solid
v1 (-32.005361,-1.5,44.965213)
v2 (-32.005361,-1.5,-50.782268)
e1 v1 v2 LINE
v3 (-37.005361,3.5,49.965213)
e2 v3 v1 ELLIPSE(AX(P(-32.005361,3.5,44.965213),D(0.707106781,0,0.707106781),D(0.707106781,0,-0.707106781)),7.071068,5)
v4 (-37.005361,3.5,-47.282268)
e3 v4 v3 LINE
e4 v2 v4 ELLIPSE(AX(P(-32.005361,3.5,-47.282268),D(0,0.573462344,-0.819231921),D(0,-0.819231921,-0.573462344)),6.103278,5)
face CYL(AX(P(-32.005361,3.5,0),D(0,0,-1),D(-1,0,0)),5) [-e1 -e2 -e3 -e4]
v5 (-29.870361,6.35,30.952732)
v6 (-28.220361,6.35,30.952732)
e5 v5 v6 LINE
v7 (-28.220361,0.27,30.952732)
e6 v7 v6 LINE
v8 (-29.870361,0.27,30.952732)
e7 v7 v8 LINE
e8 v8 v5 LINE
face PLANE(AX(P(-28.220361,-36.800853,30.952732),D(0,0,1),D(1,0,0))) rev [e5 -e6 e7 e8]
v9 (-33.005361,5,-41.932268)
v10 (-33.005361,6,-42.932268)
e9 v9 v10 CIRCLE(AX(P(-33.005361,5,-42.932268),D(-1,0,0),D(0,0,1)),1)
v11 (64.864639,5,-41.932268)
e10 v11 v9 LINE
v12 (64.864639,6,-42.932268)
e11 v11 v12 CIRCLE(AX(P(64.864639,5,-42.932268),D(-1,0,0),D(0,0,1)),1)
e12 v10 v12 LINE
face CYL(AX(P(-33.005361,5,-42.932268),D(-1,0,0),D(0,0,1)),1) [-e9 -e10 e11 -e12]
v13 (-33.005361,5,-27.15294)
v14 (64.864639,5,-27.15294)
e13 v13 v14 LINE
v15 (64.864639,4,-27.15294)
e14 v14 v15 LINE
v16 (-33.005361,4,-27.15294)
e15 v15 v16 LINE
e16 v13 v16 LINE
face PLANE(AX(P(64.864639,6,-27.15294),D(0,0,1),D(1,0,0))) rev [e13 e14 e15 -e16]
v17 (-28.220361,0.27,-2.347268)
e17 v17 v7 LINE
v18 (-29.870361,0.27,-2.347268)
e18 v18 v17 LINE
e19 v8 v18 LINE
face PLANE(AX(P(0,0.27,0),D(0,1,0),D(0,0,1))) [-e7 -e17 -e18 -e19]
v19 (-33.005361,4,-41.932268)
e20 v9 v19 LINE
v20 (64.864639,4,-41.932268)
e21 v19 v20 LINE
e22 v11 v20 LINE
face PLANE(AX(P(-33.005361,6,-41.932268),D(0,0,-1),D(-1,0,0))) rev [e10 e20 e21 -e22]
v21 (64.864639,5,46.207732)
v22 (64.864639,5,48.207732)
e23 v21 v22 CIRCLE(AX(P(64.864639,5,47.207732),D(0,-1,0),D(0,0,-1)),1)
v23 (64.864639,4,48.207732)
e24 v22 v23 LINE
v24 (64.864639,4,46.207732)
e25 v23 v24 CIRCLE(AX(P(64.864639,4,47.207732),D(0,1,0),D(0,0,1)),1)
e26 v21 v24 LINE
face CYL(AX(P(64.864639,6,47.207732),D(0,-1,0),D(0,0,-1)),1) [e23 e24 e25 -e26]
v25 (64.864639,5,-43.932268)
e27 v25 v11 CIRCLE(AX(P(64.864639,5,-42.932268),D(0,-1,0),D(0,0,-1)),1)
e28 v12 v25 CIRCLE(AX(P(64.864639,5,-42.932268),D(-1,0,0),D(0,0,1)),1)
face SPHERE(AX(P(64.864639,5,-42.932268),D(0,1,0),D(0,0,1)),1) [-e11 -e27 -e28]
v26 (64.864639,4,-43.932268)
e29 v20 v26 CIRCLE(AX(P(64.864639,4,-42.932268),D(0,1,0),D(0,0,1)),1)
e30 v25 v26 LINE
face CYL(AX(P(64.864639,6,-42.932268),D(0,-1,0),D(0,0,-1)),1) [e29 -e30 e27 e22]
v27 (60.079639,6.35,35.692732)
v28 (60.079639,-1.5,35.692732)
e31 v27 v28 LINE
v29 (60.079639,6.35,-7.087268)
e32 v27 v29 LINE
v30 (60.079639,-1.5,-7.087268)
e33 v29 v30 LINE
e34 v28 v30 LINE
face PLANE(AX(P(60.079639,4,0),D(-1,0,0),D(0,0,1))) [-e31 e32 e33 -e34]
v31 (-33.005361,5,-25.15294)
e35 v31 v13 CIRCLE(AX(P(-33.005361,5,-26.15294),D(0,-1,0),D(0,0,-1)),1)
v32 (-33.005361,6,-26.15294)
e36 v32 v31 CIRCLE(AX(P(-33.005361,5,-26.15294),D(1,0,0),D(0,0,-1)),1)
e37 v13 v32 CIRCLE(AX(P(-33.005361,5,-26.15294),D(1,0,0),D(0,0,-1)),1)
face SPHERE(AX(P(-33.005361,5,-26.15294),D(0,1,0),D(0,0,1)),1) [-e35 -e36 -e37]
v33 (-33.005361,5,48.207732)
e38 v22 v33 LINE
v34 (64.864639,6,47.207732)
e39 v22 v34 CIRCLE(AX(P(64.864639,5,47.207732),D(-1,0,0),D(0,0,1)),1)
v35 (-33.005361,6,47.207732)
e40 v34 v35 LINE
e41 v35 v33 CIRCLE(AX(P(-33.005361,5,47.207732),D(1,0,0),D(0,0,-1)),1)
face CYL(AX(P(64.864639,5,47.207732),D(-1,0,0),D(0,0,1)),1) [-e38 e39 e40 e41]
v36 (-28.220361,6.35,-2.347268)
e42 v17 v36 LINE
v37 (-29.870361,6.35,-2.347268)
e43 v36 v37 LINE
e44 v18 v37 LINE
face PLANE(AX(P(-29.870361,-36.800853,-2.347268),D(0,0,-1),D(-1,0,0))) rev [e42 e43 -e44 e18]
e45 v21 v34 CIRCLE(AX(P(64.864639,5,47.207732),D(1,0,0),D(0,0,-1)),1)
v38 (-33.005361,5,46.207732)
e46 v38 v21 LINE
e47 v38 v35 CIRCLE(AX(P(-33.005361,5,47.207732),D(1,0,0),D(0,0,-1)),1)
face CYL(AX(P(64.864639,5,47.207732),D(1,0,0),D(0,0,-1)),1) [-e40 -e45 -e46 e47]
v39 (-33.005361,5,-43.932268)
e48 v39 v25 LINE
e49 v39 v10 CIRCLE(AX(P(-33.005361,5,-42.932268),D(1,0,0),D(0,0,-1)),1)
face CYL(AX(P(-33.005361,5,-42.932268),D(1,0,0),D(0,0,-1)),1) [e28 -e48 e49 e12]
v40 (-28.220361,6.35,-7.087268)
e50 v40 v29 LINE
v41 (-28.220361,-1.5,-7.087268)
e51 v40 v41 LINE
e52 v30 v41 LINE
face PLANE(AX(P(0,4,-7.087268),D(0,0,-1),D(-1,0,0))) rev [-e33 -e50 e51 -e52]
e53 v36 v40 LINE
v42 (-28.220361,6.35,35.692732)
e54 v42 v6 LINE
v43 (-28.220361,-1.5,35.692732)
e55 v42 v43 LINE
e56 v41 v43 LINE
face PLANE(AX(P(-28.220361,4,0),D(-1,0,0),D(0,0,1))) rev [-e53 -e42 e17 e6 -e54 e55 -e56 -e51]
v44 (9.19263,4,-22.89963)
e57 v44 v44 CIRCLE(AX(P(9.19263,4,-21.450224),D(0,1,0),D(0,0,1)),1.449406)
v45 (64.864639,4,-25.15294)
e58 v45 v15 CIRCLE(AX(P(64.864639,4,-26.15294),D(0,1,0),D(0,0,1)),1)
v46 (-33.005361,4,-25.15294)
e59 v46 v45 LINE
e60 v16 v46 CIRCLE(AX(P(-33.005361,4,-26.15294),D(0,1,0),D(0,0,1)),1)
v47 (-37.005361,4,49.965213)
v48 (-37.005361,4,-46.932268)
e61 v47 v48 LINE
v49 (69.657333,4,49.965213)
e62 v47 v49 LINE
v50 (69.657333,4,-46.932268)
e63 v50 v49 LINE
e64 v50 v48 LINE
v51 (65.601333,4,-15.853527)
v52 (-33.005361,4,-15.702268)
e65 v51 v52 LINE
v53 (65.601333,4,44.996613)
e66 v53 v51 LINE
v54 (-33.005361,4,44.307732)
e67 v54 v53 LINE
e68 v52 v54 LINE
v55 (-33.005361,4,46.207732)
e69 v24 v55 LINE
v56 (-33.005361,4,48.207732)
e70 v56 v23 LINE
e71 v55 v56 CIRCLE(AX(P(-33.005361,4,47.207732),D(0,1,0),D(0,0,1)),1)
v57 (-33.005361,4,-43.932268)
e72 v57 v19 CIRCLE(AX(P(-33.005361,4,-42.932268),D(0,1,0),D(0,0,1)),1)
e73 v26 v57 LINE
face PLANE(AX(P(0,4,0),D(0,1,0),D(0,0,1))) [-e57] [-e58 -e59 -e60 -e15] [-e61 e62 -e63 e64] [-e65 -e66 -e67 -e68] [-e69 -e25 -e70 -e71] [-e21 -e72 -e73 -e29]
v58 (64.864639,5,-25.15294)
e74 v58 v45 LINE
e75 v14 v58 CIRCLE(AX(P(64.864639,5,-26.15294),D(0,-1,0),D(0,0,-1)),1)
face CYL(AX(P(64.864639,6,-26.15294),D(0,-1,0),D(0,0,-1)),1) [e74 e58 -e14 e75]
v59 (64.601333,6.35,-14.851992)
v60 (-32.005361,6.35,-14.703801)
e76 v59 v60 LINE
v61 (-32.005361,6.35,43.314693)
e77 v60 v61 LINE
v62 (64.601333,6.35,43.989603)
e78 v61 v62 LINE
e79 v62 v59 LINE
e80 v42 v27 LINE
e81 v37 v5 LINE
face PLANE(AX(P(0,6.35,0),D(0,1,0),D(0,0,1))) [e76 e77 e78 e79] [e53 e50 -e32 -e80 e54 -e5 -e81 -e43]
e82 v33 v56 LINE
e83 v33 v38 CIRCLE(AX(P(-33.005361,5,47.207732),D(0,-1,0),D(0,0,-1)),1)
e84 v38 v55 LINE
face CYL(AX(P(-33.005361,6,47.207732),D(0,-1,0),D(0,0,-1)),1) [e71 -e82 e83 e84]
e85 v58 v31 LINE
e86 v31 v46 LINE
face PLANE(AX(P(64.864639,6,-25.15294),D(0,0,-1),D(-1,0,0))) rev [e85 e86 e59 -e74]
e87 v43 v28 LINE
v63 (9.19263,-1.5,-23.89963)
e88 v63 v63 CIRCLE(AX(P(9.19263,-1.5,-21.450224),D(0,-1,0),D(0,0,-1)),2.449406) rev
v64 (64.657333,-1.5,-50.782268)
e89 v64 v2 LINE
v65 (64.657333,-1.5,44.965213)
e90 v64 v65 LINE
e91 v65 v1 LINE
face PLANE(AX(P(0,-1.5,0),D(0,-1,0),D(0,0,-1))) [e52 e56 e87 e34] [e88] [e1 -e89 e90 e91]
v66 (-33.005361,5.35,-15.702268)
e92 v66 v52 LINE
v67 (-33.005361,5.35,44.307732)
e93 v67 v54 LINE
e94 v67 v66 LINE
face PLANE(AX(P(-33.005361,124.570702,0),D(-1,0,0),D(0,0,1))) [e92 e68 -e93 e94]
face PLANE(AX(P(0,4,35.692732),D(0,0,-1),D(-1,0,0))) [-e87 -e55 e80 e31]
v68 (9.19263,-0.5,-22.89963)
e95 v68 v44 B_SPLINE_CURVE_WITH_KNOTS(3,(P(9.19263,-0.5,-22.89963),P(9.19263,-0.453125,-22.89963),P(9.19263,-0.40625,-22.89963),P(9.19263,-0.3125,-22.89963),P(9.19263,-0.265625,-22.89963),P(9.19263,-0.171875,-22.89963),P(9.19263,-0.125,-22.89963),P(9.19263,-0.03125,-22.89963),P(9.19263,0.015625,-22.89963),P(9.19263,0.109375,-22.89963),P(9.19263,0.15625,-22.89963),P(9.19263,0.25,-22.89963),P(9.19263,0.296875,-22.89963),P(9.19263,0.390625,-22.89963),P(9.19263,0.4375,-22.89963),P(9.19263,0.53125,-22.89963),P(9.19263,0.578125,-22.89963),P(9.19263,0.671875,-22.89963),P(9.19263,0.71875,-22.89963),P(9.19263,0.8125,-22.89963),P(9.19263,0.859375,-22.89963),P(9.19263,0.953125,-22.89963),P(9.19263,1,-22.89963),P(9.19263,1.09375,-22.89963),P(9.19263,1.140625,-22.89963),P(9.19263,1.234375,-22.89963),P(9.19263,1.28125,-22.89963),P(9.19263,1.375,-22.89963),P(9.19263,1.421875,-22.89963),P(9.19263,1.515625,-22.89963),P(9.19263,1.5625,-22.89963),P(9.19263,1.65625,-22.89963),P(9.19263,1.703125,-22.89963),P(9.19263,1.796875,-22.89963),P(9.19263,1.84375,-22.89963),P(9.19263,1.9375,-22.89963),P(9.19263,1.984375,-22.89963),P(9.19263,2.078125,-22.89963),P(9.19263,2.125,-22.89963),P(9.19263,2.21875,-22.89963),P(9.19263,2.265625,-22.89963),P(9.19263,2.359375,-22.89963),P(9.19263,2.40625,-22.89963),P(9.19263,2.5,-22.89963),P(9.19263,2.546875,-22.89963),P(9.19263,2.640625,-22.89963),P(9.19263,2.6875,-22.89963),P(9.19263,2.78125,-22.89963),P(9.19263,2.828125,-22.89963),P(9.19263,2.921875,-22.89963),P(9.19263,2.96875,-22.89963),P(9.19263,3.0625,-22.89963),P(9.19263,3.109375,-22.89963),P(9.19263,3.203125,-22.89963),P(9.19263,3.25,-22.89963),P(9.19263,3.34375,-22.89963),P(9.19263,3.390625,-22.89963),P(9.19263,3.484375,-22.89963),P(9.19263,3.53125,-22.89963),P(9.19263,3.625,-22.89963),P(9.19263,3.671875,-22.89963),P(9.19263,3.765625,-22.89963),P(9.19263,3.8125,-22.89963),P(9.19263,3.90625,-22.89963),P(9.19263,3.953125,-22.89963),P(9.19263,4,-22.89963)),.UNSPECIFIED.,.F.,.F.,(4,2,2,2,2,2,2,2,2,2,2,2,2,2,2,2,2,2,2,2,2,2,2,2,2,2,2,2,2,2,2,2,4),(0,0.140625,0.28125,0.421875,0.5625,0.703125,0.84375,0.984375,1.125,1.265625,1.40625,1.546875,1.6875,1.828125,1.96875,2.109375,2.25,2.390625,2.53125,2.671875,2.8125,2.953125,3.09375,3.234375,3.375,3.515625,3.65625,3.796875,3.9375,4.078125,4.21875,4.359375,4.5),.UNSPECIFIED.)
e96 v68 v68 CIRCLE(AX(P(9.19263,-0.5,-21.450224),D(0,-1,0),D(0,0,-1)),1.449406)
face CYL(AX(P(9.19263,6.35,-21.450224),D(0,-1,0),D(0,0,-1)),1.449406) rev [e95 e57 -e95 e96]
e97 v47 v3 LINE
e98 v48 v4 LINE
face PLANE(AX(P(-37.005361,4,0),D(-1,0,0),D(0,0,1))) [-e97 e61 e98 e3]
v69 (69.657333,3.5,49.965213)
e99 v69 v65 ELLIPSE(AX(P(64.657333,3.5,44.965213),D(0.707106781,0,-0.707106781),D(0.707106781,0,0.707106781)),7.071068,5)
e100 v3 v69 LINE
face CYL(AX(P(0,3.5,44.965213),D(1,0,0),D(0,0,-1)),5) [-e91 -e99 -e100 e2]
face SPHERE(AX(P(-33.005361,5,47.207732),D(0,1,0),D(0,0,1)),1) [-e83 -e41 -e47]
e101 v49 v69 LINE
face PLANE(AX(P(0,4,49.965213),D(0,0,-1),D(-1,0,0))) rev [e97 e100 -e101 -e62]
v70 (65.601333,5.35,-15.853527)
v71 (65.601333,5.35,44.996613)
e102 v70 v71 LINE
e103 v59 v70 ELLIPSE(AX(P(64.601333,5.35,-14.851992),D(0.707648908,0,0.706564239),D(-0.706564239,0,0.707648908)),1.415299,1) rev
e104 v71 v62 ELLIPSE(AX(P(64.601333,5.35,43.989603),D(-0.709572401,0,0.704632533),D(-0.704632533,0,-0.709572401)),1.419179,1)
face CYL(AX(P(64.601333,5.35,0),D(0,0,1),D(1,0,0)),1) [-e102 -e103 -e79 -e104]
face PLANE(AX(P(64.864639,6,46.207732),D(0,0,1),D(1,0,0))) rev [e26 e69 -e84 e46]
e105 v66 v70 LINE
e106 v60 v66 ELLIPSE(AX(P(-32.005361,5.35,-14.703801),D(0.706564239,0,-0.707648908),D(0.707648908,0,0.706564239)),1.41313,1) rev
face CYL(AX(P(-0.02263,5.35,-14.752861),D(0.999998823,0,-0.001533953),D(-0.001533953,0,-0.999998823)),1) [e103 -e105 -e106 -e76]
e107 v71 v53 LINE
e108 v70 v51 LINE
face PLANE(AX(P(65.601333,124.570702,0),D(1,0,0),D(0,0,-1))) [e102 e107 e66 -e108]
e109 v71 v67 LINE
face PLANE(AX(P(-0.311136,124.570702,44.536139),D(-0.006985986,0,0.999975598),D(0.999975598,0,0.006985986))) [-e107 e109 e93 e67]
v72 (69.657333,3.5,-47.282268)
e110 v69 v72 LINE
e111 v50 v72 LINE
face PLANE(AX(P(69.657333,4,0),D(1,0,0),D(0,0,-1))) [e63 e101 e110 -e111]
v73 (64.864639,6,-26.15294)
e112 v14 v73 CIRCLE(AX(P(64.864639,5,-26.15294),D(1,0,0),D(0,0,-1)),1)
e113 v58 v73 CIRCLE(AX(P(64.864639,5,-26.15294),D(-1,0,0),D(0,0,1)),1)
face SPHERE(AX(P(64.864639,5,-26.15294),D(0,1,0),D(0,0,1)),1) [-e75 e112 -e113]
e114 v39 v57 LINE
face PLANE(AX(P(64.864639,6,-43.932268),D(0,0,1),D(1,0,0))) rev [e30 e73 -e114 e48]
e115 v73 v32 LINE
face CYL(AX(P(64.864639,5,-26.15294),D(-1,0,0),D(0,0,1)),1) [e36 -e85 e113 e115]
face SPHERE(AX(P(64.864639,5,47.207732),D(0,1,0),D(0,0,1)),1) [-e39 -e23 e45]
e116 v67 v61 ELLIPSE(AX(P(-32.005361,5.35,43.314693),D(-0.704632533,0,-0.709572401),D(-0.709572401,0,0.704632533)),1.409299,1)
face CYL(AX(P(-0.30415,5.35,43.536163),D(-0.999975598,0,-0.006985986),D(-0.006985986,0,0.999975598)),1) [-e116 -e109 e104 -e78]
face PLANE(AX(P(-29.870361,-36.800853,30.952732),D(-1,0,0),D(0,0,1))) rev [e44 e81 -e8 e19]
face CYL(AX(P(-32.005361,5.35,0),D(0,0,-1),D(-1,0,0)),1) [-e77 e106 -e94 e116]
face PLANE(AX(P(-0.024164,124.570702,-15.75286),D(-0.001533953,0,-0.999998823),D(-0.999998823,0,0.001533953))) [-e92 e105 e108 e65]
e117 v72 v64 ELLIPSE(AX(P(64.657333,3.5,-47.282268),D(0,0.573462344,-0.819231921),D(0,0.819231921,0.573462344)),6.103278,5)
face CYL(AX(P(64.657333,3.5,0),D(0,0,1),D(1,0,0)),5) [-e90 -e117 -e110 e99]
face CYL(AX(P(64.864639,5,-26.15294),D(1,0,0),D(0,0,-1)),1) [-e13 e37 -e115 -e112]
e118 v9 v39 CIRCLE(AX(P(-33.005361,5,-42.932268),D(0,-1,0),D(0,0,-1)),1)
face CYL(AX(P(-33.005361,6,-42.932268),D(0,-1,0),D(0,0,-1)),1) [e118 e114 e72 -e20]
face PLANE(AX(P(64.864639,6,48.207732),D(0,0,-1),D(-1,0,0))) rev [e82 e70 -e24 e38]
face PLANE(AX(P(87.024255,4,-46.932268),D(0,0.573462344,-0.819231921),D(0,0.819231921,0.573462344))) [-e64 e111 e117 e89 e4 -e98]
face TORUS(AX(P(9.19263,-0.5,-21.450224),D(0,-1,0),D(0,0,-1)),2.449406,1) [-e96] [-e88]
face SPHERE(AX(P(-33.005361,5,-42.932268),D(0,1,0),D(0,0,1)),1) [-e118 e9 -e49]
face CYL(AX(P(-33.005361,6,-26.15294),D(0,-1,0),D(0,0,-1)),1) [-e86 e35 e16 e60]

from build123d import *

# Parameters (mm, degrees)
SKETCH1_W           = 106.662693993
SKETCH1_H           = 83.18856
SKETCH1_W_2         = 88.3
SKETCH1_H_2         = 42.78
BOSS_EXTRUDE1_DEPTH = 4
SKETCH1_4_W         = 88.3
SKETCH1_4_H         = 42.78
BOSS_EXTRUDE2_DEPTH = 6.35
SKETCH2_R           = 1.449406475
CUT_EXTRUDE1_DEPTH  = 86.959228837
BOSS_EXTRUDE3_DEPTH = 106.662693993
FILLET6_R           = 1
BOSS_EXTRUDE4_DEPTH = 2
FILLET7_R           = 1
SKETCH5_W           = 1.65
SKETCH5_H           = 33.3
CUT_EXTRUDE3_DEPTH  = 6.08
BOSS_EXTRUDE6_START = 1.5
SKETCH10_W          = 106.662693993
SKETCH10_H          = 93.062075056
SKETCH10_R          = 1.449406475
SKETCH10_W_2        = 88.3
SKETCH10_H_2        = 42.78
BOSS_EXTRUDE6_DEPTH = 1.5
BOSS_EXTRUDE7_DEPTH = 106.662693993
FILLET9_R           = 1
FILLET10_R          = 5


with BuildPart() as part:
    # Sketch1 → Boss-Extrude1 (new body)
    with BuildSketch(Plane(origin=(0, 0, 0), x_dir=(1, 0, 0), z_dir=(0, 1, 0))):
        with Locations((16.325985563, -8.370933327)):
            Rectangle(SKETCH1_W, SKETCH1_H)
        with Locations((15.929638567, -14.302731543)):
            Rectangle(SKETCH1_W_2, SKETCH1_H_2, mode=Mode.SUBTRACT)
    extrude(amount=BOSS_EXTRUDE1_DEPTH)

    # Sketch1<4> → Boss-Extrude2 (add)
    with BuildSketch(Plane(origin=(0, 0, 0), x_dir=(1, 0, 0), z_dir=(0, 1, 0))):
        Polygon((-33.005361433, -44.307731543), (65.60133256, -44.996613327), (65.60133256, 15.853526673), (-33.005361433, 15.702268457), align=None)
        with Locations((15.929638567, -14.302731543)):
            Rectangle(SKETCH1_4_W, SKETCH1_4_H, mode=Mode.SUBTRACT)
    extrude(amount=BOSS_EXTRUDE2_DEPTH)

    # Sketch2 → Cut-Extrude1 (cut, through all)
    with BuildSketch(Plane.XZ):
        with Locations(Location((9.192630415, -21.45022355, 0), (0, 0, 270))):
            Circle(SKETCH2_R)
    extrude(amount=-CUT_EXTRUDE1_DEPTH, mode=Mode.SUBTRACT)

    # Sketch3 → Boss-Extrude3 (add)
    with BuildSketch(Plane.ZY.offset(37.005361433)):
        Polygon((-32.832268457, 0), (-49.732268457, 0), (-46.932268457, 4), (-32.832268457, 4), align=None)
    extrude(amount=-BOSS_EXTRUDE3_DEPTH)

    # Fillet6
    fillet6_edges = [part.edges().sort_by_distance(p)[0] for p in [
        (-33.005361433, 6.35, 14.302731543),
        (16.297985564, 6.35, 44.652172435),
        (65.60133256, 6.35, 14.571543327),
        (16.297985564, 6.35, -15.777897565),
    ]]
    fillet(fillet6_edges, radius=FILLET6_R)

    # Sketch4 → Boss-Extrude4 (add)
    with BuildSketch(Plane(origin=(0, 4, 0), x_dir=(1, 0, 0), z_dir=(0, 1, 0))):
        with BuildLine():
            Line((64.864638567, 25.152939827), (-33.005361433, 25.152939827))
            ThreePointArc((-33.005361433, 25.152939827), (-34.005361433, 26.152939827), (-33.005361433, 27.152939827))
            Line((-33.005361433, 27.152939827), (64.864638567, 27.152939827))
            ThreePointArc((64.864638567, 27.152939827), (65.864638567, 26.152939827), (64.864638567, 25.152939827))
        make_face()
        with BuildLine():
            Line((-33.005361433, 41.932268457), (64.864638567, 41.932268457))
            ThreePointArc((64.864638567, 41.932268457), (65.864638567, 42.932268457), (64.864638567, 43.932268457))
            Line((64.864638567, 43.932268457), (-33.005361433, 43.932268457))
            ThreePointArc((-33.005361433, 43.932268457), (-34.005361433, 42.932268457), (-33.005361433, 41.932268457))
        make_face()
        with BuildLine():
            Line((64.864638567, -48.207731543), (-33.005361433, -48.207731543))
            ThreePointArc((-33.005361433, -48.207731543), (-34.005361433, -47.207731543), (-33.005361433, -46.207731543))
            Line((-33.005361433, -46.207731543), (64.864638567, -46.207731543))
            ThreePointArc((64.864638567, -46.207731543), (65.864638567, -47.207731543), (64.864638567, -48.207731543))
        make_face()
    extrude(amount=BOSS_EXTRUDE4_DEPTH)

    # Fillet7
    fillet7_edges = [part.edges().sort_by_distance(p)[0] for p in [
        (65.864638567, 6, -26.152939827),
        (15.929638567, 6, -27.152939827),
        (-34.005361433, 6, -26.152939827),
        (15.929638567, 6, -25.152939827),
        (65.864638567, 6, 47.207731543),
        (15.929638567, 6, 46.207731543),
        (-34.005361433, 6, 47.207731543),
        (15.929638567, 6, 48.207731543),
        (-34.005361433, 6, -42.932268457),
        (15.929638567, 6, -41.932268457),
        (65.864638567, 6, -42.932268457),
        (15.929638567, 6, -43.932268457),
    ]]
    fillet(fillet7_edges, radius=FILLET7_R - 0.0001)  # a hair under: the kernel refuses the full size

    # Sketch5 → Cut-Extrude3 (cut)
    with BuildSketch(Plane(origin=(0, 6.35, 0), x_dir=(1, 0, 0), z_dir=(0, 1, 0))):
        with Locations((-29.045361433, -14.302731543)):
            Rectangle(SKETCH5_W, SKETCH5_H)
    extrude(amount=-CUT_EXTRUDE3_DEPTH, mode=Mode.SUBTRACT)

    # Sketch10 → Boss-Extrude6 (add)
    with BuildSketch(Plane.XZ.offset(BOSS_EXTRUDE6_START)):
        with Locations((16.325985563, 3.434175799)):
            Rectangle(SKETCH10_W, SKETCH10_H)
        with Locations(Location((9.192630415, -21.45022355, 0), (0, 0, 270))):
            Circle(SKETCH10_R, mode=Mode.SUBTRACT)
        with Locations((15.929638567, 14.302731543)):
            Rectangle(SKETCH10_W_2, SKETCH10_H_2, mode=Mode.SUBTRACT)
    extrude(amount=-BOSS_EXTRUDE6_DEPTH)

    # Sketch11 → Boss-Extrude7 (add)
    with BuildSketch(Plane.ZY.offset(37.005361433)):
        Polygon((-49.732268457, 0), (-50.782268457, -1.5), (-43.096861729, -1.5), (-43.096861729, 0), align=None)
    extrude(amount=-BOSS_EXTRUDE7_DEPTH)

    # Fillet9
    fillet9_edges = [part.edges().sort_by_distance(p)[0] for p in [
        (9.192630415, -1.5, -20.000817075),
    ]]
    fillet(fillet9_edges, radius=FILLET9_R)

    # Fillet10
    fillet10_edges = [part.edges().sort_by_distance(p)[0] for p in [
        (-37.005361433, -1.5, -0.408527565),
        (69.65733256, -1.5, -0.408527565),
        (16.325985564, -1.5, 49.965213327),
    ]]
    fillet(fillet10_edges, radius=FILLET10_R)


solid = part.part
